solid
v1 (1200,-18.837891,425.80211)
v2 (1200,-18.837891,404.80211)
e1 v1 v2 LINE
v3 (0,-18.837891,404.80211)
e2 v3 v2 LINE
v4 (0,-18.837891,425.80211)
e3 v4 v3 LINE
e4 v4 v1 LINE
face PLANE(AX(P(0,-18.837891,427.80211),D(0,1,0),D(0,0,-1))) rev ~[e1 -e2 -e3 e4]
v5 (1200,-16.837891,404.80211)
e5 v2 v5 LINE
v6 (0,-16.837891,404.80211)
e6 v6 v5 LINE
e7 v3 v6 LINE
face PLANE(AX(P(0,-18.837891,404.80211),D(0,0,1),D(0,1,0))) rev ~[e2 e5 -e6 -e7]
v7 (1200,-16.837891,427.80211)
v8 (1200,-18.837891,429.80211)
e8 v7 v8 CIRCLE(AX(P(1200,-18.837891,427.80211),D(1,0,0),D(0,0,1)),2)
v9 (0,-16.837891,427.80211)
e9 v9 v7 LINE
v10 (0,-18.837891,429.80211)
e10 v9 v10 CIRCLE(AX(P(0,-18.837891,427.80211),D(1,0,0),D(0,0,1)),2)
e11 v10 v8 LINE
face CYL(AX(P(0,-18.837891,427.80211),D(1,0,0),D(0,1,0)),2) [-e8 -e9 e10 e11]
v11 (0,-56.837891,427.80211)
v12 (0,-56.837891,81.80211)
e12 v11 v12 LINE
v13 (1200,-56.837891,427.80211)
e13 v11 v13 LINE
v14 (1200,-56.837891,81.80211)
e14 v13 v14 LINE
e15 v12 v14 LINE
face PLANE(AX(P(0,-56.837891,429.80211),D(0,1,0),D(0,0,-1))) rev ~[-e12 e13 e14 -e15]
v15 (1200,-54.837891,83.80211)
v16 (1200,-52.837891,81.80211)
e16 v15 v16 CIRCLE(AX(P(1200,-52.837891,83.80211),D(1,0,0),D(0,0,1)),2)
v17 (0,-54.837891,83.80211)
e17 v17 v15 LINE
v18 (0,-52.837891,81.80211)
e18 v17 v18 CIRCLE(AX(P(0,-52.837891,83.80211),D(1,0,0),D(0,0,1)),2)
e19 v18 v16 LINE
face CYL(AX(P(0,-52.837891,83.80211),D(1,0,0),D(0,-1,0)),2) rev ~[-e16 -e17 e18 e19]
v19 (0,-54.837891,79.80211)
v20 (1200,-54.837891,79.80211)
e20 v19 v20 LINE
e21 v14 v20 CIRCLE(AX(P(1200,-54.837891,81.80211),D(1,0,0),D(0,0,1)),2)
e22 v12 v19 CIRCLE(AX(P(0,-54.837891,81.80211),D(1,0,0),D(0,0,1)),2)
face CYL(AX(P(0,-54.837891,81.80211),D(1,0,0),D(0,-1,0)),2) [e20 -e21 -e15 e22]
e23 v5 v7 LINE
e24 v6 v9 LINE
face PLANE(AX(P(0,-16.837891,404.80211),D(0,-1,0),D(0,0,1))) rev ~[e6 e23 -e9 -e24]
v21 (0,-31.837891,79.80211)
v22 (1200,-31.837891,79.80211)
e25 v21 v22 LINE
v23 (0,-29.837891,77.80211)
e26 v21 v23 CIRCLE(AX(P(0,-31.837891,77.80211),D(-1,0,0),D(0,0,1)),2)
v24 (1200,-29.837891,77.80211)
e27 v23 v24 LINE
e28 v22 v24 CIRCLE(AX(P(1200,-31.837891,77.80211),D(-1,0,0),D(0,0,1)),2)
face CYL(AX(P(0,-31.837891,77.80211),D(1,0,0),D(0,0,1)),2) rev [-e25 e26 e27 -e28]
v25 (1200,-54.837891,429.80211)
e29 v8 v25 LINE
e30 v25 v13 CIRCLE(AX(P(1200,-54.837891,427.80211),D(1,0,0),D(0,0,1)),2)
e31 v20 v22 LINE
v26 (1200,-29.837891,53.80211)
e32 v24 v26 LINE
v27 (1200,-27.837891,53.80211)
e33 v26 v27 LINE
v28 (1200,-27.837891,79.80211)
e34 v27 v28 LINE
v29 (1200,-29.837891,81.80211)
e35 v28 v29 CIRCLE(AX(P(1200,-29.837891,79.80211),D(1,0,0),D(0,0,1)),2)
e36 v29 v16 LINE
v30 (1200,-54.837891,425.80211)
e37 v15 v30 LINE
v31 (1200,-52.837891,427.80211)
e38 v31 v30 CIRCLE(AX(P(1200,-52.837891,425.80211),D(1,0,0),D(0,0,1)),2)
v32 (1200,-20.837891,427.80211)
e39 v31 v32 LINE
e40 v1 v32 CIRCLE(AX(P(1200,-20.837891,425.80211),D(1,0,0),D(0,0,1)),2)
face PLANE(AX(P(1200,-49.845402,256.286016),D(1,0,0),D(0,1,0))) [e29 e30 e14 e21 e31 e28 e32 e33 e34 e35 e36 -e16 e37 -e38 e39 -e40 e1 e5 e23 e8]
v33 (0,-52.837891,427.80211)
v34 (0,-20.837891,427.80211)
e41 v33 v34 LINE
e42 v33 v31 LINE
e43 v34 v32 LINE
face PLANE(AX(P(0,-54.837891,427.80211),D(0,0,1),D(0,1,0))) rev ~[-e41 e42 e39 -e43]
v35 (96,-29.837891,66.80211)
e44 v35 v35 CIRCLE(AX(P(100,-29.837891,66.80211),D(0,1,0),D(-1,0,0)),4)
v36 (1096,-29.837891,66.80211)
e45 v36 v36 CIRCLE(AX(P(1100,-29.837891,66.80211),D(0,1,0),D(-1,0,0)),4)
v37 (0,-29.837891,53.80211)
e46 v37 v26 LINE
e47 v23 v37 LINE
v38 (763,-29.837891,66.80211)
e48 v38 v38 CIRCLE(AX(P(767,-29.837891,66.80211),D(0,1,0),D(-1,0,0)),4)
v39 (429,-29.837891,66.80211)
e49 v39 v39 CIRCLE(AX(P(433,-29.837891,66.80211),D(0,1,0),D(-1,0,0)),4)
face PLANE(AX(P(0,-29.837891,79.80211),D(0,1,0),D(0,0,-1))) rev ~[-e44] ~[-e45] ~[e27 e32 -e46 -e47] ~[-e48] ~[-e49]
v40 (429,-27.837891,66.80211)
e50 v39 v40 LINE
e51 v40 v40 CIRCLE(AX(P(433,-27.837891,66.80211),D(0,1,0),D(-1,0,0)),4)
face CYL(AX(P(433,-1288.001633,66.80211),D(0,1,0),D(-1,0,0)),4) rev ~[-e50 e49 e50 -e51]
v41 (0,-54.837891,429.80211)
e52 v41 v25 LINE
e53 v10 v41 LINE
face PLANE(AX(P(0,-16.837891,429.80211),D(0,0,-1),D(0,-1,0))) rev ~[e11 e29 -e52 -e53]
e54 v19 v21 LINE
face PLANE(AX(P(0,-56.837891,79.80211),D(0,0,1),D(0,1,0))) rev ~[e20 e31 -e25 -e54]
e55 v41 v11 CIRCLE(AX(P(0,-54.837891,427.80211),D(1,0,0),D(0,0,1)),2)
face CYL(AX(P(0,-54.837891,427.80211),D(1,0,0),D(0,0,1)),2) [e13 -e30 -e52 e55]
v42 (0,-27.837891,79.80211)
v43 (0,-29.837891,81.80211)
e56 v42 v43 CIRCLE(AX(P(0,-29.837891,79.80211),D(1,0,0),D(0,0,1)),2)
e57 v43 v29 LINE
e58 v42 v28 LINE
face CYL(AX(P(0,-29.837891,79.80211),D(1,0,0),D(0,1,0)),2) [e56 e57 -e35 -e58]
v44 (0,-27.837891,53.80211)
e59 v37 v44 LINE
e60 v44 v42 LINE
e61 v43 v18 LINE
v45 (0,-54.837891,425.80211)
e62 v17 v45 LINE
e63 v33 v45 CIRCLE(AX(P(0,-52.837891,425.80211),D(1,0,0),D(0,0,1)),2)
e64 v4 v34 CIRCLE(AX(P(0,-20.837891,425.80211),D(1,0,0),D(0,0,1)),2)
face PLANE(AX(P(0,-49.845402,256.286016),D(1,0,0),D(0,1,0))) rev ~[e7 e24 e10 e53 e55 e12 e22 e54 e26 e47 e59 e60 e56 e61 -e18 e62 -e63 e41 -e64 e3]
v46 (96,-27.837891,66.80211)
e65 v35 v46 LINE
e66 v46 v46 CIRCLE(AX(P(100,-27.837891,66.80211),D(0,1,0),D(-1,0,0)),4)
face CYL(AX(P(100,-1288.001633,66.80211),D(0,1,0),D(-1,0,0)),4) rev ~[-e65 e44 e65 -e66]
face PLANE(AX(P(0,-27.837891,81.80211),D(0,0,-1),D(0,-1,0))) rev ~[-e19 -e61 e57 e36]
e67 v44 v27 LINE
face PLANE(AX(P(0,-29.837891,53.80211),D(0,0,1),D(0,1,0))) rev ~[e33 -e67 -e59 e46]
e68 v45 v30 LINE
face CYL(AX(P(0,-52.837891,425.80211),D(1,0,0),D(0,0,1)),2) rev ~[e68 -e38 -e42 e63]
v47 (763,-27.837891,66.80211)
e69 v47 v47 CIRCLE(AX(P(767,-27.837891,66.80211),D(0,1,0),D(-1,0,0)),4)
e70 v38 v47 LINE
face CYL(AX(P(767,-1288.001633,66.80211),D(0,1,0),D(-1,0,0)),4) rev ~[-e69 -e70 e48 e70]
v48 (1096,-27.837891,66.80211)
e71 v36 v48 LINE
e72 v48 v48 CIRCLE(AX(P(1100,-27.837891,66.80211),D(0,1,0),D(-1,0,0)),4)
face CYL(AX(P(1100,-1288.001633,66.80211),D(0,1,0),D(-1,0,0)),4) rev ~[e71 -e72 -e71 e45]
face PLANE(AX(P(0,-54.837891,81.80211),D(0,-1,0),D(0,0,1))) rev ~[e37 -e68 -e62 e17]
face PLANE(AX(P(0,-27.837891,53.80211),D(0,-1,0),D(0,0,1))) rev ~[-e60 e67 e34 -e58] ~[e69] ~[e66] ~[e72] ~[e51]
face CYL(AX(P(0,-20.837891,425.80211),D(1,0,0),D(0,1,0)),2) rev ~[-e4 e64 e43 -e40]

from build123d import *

# Parameters (mm, degrees)
F1_DEPTH = 1200
F3_D     = 8
F4_R     = 2


# Not quite as in the source:
# - a feature names something its author has since deleted; it is built from what else it names


with BuildPart() as f1:
    # F0 (on Right) → F1 (new body)
    with BuildSketch(Plane.YZ):
        Polygon((-18.8378913403, 427.8021101952), (-18.8378913403, 404.8021101952), (-16.8378913403, 404.8021101952), (-16.8378913403, 429.8021101952), (-56.8378913403, 429.8021101952), (-56.8378913403, 79.8021101952), (-29.8378913403, 79.8021101952), (-29.8378913403, 53.8021101952), (-27.8378913403, 53.8021101952), (-27.8378913403, 81.8021101952), (-54.8378913403, 81.8021101952), (-54.8378913403, 427.8021101952), align=None)
    extrude(amount=F1_DEPTH)

    # F3 (through all)
    with Locations(Plane.XZ.offset(29.8378913403)):
        with Locations((433, 66.8021101952), (767, 66.8021101952), (1100, 66.8021101952), (100, 66.8021101952)):
            Hole(F3_D / 2)

    # F4
    f4_edges = [f1.edges().sort_by_distance(p)[0] for p in [
        (600, -56.837891, 429.80211),
        (600, -16.837891, 429.80211),
        (600, -56.837891, 79.80211),
        (600, -27.837891, 81.80211),
        (600, -54.837891, 81.80211),
        (600, -29.837891, 79.80211),
        (600, -18.837891, 427.80211),
        (600, -54.837891, 427.80211),
    ]]
    fillet(f4_edges, radius=F4_R)


solid = f1.part
